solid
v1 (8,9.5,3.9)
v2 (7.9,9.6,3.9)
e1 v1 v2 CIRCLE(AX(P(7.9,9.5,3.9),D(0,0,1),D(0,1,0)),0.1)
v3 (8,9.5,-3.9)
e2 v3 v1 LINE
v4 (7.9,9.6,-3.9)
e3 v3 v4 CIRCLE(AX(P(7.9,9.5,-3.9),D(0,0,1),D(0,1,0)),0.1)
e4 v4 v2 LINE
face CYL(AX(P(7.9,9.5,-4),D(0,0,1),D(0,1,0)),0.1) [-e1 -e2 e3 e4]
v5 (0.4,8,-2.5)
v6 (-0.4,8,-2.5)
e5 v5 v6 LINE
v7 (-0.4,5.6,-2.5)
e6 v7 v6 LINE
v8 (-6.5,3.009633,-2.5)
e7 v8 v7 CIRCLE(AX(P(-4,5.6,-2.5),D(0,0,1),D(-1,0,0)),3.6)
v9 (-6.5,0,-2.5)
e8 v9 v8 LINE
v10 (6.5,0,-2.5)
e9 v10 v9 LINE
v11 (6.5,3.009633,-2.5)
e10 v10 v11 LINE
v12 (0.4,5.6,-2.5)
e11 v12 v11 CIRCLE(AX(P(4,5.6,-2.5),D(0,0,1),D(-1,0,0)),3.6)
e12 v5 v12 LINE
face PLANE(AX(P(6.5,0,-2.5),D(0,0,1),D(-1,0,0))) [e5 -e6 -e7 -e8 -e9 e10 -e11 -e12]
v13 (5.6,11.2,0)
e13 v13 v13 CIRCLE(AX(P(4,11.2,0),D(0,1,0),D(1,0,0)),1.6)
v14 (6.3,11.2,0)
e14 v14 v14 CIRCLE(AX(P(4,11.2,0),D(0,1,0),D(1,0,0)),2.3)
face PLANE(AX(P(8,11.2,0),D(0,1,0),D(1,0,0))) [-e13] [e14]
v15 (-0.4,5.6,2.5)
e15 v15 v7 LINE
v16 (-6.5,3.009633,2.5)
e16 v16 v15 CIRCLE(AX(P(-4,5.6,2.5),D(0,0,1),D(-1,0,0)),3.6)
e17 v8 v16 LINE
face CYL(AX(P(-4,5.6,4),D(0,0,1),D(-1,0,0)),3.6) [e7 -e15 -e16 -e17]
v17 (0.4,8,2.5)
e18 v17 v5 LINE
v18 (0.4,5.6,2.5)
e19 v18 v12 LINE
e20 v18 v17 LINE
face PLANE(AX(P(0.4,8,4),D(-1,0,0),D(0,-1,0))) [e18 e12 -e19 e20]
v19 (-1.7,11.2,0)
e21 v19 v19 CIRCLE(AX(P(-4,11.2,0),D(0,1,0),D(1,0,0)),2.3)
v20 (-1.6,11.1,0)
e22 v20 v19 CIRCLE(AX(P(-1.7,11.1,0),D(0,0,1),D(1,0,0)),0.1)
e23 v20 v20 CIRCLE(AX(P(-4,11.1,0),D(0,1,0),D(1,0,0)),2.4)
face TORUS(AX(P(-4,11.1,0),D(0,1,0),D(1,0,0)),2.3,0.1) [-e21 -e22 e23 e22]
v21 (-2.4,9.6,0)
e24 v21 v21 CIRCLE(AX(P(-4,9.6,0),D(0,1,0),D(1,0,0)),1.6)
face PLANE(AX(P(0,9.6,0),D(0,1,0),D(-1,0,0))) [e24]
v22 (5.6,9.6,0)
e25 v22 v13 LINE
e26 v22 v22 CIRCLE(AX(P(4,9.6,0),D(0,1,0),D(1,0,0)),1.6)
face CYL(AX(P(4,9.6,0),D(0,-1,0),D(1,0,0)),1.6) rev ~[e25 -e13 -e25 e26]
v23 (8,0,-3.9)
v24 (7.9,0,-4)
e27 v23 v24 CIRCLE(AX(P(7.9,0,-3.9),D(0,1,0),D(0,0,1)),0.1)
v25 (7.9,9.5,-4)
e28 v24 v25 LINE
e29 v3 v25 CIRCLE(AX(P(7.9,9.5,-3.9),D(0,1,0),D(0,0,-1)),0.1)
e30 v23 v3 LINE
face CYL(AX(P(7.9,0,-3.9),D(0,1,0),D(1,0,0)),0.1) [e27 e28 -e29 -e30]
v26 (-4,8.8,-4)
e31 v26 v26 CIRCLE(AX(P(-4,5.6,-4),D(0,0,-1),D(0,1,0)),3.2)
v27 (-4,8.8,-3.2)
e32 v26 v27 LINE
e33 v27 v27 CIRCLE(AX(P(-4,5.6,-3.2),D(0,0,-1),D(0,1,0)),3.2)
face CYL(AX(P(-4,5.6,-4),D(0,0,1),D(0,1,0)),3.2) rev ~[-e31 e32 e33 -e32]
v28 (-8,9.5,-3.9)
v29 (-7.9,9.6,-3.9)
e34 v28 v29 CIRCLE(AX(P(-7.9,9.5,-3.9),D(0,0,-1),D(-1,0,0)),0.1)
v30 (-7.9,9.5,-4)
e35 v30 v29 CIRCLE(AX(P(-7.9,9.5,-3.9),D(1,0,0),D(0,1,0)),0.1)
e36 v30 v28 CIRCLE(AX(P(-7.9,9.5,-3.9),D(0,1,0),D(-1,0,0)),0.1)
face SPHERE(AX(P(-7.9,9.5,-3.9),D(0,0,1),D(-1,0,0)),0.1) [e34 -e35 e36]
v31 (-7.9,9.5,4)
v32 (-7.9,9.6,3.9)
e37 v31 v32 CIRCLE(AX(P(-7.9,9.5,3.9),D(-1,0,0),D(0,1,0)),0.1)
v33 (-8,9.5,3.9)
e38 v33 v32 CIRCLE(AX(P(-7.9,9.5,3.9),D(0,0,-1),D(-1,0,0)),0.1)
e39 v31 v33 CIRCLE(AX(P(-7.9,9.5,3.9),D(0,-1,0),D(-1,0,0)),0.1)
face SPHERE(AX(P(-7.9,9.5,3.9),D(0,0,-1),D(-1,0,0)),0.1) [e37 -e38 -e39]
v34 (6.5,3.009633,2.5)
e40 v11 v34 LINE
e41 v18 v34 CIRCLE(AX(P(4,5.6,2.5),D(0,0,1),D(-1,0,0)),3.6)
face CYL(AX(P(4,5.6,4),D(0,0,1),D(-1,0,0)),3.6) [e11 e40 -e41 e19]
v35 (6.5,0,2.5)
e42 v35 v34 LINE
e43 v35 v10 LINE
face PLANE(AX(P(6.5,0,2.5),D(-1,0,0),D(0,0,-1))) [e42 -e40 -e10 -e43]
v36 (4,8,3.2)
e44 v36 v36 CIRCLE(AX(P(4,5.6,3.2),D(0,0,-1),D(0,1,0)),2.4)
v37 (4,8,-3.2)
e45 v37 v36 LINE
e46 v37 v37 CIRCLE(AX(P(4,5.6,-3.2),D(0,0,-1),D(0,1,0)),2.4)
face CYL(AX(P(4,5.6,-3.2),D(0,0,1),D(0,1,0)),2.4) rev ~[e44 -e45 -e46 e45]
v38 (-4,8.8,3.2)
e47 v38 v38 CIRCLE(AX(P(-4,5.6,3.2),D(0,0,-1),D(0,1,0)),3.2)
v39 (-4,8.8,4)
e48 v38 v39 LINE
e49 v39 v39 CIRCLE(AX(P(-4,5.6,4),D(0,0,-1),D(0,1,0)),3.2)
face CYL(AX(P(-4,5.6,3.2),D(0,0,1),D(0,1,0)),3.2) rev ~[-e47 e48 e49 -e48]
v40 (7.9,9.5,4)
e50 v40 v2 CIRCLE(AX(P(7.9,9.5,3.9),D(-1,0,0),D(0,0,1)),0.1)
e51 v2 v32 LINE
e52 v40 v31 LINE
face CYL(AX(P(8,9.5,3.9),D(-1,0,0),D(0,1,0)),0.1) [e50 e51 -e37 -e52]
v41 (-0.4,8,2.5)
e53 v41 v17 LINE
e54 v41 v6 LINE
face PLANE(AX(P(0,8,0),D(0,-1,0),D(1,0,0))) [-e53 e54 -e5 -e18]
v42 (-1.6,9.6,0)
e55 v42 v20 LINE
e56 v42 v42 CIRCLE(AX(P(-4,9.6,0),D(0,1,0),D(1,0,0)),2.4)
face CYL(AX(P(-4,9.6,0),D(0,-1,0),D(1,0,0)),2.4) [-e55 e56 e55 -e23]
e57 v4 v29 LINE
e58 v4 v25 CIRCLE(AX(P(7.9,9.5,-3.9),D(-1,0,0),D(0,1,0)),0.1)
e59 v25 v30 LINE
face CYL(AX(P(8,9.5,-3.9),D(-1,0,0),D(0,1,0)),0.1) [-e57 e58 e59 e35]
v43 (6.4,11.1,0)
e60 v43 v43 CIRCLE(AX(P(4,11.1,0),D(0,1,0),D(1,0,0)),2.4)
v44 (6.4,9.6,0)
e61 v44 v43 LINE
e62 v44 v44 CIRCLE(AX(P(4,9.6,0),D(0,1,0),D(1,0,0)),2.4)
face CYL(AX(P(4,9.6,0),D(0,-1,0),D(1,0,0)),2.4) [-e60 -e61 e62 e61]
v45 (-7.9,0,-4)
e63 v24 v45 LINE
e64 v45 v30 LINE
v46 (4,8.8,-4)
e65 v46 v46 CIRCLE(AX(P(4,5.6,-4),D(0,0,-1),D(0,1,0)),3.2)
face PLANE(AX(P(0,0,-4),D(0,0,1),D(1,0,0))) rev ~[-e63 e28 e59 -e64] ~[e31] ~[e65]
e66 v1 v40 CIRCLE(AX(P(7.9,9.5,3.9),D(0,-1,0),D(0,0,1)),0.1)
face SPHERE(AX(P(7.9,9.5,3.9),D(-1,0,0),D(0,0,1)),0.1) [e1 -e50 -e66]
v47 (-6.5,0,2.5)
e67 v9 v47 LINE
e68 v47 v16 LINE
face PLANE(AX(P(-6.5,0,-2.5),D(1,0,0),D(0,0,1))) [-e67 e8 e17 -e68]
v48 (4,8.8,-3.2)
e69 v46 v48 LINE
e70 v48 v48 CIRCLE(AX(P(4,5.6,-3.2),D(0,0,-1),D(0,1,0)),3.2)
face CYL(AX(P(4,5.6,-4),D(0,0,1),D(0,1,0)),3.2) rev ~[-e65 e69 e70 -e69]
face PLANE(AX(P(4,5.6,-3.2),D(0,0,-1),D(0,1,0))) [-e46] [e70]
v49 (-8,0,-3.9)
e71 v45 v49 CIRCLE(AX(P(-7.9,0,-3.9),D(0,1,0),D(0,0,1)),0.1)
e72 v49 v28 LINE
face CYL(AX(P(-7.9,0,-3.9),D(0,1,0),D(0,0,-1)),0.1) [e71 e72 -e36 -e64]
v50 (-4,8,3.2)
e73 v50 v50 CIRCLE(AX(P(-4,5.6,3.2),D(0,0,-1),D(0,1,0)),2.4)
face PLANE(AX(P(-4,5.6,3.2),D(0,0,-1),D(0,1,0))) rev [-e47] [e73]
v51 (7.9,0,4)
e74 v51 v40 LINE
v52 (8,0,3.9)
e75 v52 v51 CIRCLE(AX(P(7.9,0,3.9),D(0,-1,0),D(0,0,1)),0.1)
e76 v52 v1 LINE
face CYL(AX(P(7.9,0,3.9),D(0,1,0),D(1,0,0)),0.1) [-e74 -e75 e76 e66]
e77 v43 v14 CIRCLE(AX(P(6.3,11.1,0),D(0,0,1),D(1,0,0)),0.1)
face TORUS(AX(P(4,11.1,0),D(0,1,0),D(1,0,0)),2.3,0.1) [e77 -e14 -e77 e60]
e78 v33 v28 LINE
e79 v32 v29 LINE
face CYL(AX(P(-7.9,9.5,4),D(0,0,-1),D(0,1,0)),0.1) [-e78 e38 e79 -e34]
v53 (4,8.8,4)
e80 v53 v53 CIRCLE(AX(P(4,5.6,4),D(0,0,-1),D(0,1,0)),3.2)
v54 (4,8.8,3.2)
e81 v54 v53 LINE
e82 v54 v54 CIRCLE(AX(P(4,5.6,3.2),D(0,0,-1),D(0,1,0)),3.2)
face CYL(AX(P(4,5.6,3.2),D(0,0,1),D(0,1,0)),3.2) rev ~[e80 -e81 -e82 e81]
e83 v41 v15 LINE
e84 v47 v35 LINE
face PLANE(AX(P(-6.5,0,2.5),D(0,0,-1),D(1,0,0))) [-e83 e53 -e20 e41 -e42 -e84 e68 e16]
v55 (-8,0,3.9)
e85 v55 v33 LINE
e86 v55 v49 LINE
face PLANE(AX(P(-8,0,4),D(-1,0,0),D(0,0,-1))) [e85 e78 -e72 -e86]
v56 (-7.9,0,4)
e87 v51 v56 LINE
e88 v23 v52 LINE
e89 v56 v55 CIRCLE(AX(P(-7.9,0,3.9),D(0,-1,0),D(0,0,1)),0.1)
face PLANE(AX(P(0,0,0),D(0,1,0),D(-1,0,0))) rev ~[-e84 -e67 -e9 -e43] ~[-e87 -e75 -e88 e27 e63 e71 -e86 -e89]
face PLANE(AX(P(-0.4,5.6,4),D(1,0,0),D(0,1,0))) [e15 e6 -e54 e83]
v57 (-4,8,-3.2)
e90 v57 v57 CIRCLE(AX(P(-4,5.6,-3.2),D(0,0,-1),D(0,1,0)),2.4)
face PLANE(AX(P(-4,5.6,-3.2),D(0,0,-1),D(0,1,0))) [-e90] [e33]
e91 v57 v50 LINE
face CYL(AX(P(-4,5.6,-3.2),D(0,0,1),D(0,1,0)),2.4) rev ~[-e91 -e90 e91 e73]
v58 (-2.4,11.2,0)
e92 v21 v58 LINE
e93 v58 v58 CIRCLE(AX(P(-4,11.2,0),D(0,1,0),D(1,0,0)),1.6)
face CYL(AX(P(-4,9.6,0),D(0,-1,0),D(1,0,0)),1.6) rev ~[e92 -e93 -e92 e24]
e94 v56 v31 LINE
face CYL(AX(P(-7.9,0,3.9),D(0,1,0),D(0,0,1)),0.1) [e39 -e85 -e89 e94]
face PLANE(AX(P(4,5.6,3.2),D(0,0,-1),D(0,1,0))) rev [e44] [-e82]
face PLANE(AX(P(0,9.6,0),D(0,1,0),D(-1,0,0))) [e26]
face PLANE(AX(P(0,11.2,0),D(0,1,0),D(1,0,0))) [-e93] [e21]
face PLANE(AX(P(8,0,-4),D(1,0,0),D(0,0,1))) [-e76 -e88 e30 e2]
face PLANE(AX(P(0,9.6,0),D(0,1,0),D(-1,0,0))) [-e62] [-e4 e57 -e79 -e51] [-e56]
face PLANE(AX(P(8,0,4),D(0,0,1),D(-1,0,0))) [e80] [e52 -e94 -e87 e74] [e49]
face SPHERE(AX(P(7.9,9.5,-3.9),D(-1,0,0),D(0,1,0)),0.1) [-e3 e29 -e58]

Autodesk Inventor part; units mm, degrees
ref_plane "XZ Plane" through (0, 0, 0) normal (0, 1, 0) x (-1, 0, 0)
ref_plane "XY Plane" through (0, 0, 0) normal (0, 0, 1) x (1, 0, 0)
sketch "Sketch2" plane through (0, 0, 0) normal (0, 1, 0) x (-1, 0, 0)
  line L0 (-8, -4) -> (8, -4)
  line L1 (-8, 4) -> (8, 4)
  line L2 (-8, -4) -> (-8, 4)
  line L3 (8, 4) -> (8, -4)
  point P0 (0, 0)
  point P1 (0, 4)
  point P2 (-8, 0)
  dimension "d58" = 16
  dimension "d59" = 8
extrude "Extrusion1" add sketch "Sketch2" along normal blind 9.6
sketch "Sketch9" plane through (0, 0, 0) normal (0, -1, 0) x (1, 0, 0)
  line L0 (-8, 4) -> (8, 4) projected
  line L1 (-8, -4) -> (-8, 4) projected
  line L2 (-6.5, 2.5) -> (6.5, 2.5)
  line L3 (6.5, 2.5) -> (6.5, -2.5)
  line L4 (6.5, -2.5) -> (-6.5, -2.5)
  line L5 (-6.5, -2.5) -> (-6.5, 2.5)
  point P0 (0, 0)
  point P1 (0, 2.5)
  point P2 (-6.5, 0)
  dimension "d61" = 1.5
  dimension "d62" = 1.5
extrude "Extrusion4" cut sketch "Sketch9" against normal blind 8
sketch "Sketch11" plane through (-8, 0, 4) normal (0, 0, 1) x (1, 0, 0)
  line L0 (0, 0) -> (16, 0) projected
  line L1 (0, 9.6) -> (16, 9.6) projected
  line L2 (0, 0) -> (0, 9.6) projected
  line L3 (7.6, 8) -> (0.4, 8)
  line L4 (0.4, 8) -> (0.4, 5.6)
  arc A0 (0.4, 5.6) -> (7.6, 5.6) centre (4, 5.6) ccw
  line L5 (7.6, 5.6) -> (7.6, 8)
  point P0 (8, 0)
  point P1 (8, 9.6)
  dimension "d93" = 1.6
  dimension "d94" = 4
  dimension "d96" = 7.2
  dimension "d97" = 5.6
extrude "Extrusion5" add sketch "Sketch11" against normal blind 8
sketch "Sketch4" plane through (0, 9.6, 0) normal (0, 1, 0) x (1, 0, 0)
  circle A0 centre (-4, 0) radius 2.4
  circle A1 centre (-4, 0) radius 1.6
  line L0 (-8, 4) -> (-8, -4) projected
  point P0 (-8, 0)
  dimension "d13" = 4.8
  dimension "d57" = 3.2
  dimension "d69" = 4
extrude "Extrusion3" add sketch "Sketch4" along normal blind 1.6
sketch3d "Sketch12"
feature "LEGO_SM:1" [suppressed]
fillet "Fillet1" radius 0.1 1 edges at (-6.4, 11.2, 0)
pattern_linear "Rectangular Pattern2" count 2 spacing 8 along (1, 0, 0) of "Extrusion3", "Fillet1", "Extrusion5"
fillet "Fillet2" radius 0.1 8 edges at (-8, 9.6, 0) (-8, 4.8, 4) (0, 9.6, 4) (-8, 4.8, -4) (0, 9.6, -4) (8, 4.8, 4) (8, 9.6, 0) (8, 4.8, -4)
ref_plane "Work Plane1" through (-4, 0, 0) normal (1, 0, 0) x (0, 1, 0)
sketch "Sketch10" plane through (-4, 0, 0) normal (1, 0, 0) x (0, 1, 0)
  line L0 (0, -3.9) -> (0, 3.9) projected
  line L1 (0, 4) -> (9.5, 4) projected
  line L2 (9.5, -4) -> (0, -4) projected
  line L3 (5.6, 4) -> (5.6, -4)
  line L4 (5.6, -4) -> (8.8, -4)
  line L5 (8.8, -4) -> (8.8, -3.2)
  line L6 (8.8, -3.2) -> (8, -3.2)
  line L7 (8, -3.2) -> (8, 3.2)
  line L8 (8, 3.2) -> (8.8, 3.2)
  line L9 (8.8, 3.2) -> (8.8, 4)
  line L10 (8.8, 4) -> (5.6, 4)
  line L11 (8.8, 4) -> (9.5, 4)
  line L12 (9.5, -4) -> (8.8, -4)
  line L13 (9.5, -4) -> (9.5, 4)
  point P0 (0, 0)
  dimension "d75" = 5.6
  dimension "d76" = 0.8
  dimension "d77" = 4.8
  dimension "d78" = 6.4
revolve "Revolution1" cut sketch "Sketch10" angle 360 about axis through (-4, 5.6, 4) along (0, 0, -1) contours L1 L9 L8 L7 L6 L5 L2 L3
pattern_linear "Rectangular Pattern4" count 2 spacing 8 along (1, 0, 0) of "Revolution1"
equation "\"d58\" = 8 * knobs"
equation "\"d4\" = lh"
equation "\"d62\" = d61"
equation "\"d63\" = bd"
equation "\"d93\" = topthk"
equation "\"d94\" = 0.5 * lu"
equation "\"d96\" = tlad"
equation "\"d97\" = th"
equation "\"d13\" = kd"
equation "\"d57\" = rd"
equation "\"d69\" = 0.5 * lu"
equation "\"d20\" = knobh"
equation "\"d72\" = lu"
equation "\"d75\" = th"
equation "\"d76\" = tsl"
equation "\"d77\" = tpd"
equation "\"d78\" = tsd"
equation "\"d89\" = -0.5 * lu"
equation "\"knobs\" = 2"
equation "\"lh\" = 9.6"
equation "\"bd\" = 8"
equation "\"topthk\" = 1.6"
equation "\"tlad\" = 7.2"
equation "\"th\" = 5.6"
equation "\"kd\" = 4.8"
equation "\"rd\" = 3.2"
equation "\"lu\" = 8"
equation "\"knobh\" = 1.6"
equation "\"tsl\" = 0.8"
equation "\"tpd\" = 4.8"
equation "\"tsd\" = 6.4"
properties part number "32000-Black" material "ABS Plastic"
